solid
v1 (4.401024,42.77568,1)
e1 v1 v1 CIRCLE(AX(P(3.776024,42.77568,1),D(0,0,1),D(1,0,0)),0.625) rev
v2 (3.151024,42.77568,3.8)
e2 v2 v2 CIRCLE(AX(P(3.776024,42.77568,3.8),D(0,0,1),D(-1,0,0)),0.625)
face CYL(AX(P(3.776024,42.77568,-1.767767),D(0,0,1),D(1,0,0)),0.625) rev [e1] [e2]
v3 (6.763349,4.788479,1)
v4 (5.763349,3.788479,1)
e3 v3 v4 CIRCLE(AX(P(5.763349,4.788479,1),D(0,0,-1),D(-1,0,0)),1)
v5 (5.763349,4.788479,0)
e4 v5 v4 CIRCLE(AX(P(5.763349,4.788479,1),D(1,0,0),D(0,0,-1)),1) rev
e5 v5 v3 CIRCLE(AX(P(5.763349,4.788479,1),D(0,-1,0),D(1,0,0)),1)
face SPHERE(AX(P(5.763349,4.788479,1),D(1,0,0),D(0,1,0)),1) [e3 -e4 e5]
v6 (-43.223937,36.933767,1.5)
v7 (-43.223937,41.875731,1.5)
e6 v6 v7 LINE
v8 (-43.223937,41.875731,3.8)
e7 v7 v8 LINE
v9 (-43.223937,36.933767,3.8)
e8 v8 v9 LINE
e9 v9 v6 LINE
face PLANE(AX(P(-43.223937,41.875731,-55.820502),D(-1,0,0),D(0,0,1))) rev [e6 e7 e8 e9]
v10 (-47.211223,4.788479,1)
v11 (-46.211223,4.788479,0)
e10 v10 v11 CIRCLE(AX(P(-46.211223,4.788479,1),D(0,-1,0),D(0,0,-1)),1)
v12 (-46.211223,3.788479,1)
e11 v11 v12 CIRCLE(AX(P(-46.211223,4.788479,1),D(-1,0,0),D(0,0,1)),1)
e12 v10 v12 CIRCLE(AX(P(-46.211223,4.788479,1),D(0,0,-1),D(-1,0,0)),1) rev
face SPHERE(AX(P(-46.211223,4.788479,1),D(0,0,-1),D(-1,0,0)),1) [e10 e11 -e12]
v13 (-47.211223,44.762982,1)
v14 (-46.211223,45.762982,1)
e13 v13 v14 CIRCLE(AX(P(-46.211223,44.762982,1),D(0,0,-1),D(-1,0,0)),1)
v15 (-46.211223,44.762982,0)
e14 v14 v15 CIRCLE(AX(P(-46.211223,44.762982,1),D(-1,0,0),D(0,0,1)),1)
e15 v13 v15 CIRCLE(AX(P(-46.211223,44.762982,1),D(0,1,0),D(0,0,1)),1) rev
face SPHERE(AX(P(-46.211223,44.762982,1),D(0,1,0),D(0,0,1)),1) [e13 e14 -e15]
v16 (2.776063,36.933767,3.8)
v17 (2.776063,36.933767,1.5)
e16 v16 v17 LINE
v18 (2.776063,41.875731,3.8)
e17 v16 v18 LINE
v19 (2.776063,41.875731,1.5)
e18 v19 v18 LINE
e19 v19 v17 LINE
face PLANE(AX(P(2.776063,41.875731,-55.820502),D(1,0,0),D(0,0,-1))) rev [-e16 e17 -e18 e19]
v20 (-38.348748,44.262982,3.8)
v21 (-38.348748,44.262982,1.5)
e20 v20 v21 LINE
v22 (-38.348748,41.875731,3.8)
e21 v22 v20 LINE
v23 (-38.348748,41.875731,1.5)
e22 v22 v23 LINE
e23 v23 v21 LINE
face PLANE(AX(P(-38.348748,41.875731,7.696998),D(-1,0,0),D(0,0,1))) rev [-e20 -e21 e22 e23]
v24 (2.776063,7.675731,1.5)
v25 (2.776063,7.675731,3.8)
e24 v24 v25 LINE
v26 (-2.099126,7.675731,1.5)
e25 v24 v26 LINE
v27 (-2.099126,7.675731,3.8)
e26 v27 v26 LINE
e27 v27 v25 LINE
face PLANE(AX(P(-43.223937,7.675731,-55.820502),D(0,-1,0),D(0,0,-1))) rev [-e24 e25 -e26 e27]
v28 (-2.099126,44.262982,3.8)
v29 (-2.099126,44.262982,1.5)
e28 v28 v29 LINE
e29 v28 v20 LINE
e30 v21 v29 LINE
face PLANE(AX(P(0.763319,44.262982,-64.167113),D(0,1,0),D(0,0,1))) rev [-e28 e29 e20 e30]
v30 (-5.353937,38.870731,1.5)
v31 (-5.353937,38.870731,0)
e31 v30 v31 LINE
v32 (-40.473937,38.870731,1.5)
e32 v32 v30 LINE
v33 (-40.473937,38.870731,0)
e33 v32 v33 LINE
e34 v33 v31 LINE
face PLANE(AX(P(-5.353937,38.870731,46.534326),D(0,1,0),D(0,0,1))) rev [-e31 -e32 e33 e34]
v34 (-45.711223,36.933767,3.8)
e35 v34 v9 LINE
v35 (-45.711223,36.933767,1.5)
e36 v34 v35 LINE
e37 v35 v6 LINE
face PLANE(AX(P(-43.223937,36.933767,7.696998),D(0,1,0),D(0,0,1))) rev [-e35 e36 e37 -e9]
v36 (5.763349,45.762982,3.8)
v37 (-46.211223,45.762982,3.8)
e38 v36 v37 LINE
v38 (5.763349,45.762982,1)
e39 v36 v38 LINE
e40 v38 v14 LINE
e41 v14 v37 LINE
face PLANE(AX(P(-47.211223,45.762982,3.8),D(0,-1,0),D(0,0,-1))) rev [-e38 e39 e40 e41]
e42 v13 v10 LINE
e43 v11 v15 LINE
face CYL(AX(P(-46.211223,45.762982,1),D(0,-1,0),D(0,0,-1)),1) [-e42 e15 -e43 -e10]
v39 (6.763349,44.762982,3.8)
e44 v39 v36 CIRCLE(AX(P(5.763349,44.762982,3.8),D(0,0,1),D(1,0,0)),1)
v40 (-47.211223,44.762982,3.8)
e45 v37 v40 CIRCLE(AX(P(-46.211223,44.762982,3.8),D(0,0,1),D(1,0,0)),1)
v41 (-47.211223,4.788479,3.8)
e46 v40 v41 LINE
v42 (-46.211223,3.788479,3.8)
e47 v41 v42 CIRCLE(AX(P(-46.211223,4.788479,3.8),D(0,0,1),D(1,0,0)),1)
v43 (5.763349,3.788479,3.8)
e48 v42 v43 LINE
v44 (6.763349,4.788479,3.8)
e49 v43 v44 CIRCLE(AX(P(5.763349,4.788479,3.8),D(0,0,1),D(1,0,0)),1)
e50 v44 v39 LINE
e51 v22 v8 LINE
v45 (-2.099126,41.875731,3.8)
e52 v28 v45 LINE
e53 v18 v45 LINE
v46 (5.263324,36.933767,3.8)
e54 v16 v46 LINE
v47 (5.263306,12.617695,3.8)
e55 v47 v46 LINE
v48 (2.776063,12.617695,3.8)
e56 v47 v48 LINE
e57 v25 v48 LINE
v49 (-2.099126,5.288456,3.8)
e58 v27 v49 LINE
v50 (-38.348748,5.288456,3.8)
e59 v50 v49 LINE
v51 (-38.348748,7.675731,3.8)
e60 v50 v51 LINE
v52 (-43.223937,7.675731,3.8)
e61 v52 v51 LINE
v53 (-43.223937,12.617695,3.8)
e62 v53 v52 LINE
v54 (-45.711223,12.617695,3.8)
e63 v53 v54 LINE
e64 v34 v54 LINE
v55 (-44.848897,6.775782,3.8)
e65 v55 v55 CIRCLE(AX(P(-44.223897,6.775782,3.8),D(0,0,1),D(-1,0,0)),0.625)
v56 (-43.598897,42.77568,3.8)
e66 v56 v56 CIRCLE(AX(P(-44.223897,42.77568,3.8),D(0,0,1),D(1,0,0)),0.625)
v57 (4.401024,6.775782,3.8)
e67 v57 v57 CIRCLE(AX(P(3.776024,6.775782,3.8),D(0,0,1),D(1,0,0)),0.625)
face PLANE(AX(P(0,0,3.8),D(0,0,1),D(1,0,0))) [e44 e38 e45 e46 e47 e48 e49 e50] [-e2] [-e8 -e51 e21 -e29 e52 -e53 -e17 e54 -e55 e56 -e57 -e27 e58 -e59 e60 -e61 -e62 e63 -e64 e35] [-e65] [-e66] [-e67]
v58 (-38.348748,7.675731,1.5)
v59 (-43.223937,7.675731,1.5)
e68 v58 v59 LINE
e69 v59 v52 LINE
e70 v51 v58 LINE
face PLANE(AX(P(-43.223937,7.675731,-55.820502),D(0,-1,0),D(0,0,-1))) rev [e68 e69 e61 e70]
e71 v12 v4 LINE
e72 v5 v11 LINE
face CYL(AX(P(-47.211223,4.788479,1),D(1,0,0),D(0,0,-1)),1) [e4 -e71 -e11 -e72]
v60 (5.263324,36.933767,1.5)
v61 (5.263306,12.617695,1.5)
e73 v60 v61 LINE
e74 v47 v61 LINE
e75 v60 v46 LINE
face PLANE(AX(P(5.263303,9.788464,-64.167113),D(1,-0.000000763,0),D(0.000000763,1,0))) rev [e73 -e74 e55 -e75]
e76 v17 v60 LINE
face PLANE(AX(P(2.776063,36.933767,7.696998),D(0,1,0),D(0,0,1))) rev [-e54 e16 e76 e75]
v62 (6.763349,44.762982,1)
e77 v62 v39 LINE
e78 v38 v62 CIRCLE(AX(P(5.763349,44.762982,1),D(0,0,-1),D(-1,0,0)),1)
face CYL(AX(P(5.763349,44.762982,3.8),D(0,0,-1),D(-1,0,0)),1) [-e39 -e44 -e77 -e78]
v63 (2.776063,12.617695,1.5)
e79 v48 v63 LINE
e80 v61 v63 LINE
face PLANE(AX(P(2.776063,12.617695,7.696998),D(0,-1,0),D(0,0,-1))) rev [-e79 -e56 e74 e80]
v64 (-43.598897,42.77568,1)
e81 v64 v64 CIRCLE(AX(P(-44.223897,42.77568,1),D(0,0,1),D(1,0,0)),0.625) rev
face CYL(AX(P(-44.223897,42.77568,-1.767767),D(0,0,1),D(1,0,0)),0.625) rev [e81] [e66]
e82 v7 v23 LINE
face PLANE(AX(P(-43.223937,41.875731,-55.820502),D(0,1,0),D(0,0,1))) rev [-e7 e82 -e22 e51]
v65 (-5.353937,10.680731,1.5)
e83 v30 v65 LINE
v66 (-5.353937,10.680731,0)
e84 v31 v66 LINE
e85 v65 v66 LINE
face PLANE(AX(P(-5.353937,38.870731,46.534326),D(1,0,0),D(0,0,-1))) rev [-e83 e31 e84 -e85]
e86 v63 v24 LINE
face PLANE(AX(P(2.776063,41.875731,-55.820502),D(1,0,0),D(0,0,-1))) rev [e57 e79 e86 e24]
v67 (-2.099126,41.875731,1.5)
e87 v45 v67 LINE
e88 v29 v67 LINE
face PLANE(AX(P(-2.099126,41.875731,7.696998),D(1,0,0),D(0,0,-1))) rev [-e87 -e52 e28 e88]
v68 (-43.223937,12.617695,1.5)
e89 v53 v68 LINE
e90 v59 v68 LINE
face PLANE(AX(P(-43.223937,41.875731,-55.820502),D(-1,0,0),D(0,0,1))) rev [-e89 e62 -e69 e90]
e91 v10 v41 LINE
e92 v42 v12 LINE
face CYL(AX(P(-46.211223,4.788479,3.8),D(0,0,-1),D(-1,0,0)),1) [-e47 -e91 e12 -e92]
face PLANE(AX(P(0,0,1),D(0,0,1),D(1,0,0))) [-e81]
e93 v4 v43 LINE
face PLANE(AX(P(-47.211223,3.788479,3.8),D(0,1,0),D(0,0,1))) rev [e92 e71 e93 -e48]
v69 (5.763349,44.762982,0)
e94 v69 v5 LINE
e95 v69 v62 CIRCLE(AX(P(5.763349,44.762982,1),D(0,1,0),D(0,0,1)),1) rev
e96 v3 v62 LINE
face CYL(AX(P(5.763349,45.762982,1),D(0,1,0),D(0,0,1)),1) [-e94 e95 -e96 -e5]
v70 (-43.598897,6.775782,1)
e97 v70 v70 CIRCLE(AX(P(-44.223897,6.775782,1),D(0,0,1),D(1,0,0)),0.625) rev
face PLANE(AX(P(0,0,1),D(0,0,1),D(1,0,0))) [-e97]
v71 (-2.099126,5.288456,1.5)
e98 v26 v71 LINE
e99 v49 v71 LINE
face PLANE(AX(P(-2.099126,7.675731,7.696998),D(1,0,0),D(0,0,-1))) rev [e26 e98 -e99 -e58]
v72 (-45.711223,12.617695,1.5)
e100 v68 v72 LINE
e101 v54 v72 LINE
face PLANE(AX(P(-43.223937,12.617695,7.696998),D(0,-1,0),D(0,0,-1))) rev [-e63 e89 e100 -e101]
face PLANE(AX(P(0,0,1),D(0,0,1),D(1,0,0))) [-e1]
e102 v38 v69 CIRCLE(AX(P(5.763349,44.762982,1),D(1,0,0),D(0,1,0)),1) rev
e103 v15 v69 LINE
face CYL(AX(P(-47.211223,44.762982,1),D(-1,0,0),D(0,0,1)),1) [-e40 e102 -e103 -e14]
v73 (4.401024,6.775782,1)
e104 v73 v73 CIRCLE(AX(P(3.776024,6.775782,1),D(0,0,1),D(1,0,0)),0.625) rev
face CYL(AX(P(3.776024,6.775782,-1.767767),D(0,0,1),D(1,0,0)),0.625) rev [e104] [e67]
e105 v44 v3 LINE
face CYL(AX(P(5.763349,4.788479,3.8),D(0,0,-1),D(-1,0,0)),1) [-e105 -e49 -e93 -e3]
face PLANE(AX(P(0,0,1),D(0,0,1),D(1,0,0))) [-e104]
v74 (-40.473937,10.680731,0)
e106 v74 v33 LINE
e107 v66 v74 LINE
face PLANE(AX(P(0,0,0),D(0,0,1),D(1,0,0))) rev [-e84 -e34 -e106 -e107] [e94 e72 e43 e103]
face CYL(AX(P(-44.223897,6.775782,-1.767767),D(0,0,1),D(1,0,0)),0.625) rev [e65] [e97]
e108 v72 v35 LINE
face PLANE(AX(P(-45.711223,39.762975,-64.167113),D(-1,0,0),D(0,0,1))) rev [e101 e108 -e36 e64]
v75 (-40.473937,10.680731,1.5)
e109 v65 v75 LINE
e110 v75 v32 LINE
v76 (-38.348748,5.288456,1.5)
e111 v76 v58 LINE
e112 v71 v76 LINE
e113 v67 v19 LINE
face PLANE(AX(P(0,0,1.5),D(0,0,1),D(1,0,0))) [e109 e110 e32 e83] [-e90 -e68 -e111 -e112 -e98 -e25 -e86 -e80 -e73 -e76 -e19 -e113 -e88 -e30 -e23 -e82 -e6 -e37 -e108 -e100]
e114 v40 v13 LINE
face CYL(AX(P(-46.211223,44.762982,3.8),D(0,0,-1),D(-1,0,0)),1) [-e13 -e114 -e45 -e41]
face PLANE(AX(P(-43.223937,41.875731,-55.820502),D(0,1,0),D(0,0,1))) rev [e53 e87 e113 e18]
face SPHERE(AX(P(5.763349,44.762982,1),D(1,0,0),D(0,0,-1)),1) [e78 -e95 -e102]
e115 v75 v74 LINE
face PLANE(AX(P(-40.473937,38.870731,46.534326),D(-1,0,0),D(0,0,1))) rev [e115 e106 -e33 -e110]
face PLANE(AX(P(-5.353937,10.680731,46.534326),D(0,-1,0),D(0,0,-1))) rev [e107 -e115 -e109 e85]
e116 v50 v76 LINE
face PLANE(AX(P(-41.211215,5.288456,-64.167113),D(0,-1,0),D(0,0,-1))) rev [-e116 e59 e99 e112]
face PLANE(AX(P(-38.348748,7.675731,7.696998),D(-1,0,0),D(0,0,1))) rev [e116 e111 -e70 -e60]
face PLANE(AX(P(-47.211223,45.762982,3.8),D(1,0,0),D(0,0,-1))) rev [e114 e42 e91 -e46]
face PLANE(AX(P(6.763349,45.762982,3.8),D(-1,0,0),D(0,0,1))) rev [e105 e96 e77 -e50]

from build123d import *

# Parameters (mm, degrees)
SKETCH_2_W          = 53.974572009
SKETCH_2_H          = 41.974503429
EXTRUDE_1_DEPTH     = 3.8
CUT_EXTRUDE_1_DEPTH = 2.3
SKETCH_4_W          = 46
SKETCH_4_H          = 34.2
CUT_EXTRUDE_2_DEPTH = 2.3
SKETCH_5_R          = 0.625
CUT_EXTRUDE_3_DEPTH = 2.8
SKETCH_7_W          = 35.12
SKETCH_7_H          = 28.19
CUT_EXTRUDE_4_DEPTH = 1.5
SKETCH_8_W          = 3
SKETCH_8_H          = 2.387251715
SKETCH_8_W_2        = 2.487286004
SKETCH_8_H_2        = 3
SKETCH_8_W_3        = 2.487286005
SKETCH_8_W_4        = 3.00002286
SKETCH_8_H_3        = 2.387274574
SKETCH_8_W_5        = 2.999984296
EXTRUDE_2_DEPTH     = 2.3
FILLET_1_R          = 1


with BuildPart() as part:
    # 草图2 → 凸台-拉伸1 (new body)
    with BuildSketch(Plane.XY):
        with Locations((-20.223936838, 24.775730738)):
            Rectangle(SKETCH_2_W, SKETCH_2_H)
    extrude(amount=EXTRUDE_1_DEPTH)

    # 草图3 → 切除-拉伸1 (cut)
    with BuildSketch(Plane.XY.offset(3.8)):
        with BuildLine():
            Line((0.763318687, 42.775657077), (0.763318687, 44.262982452))
            Line((0.763318687, 44.262982452), (-41.211192362, 44.262982452))
            Line((-41.211192362, 44.262982452), (-41.211192362, 42.775679937))
            ThreePointArc((-41.211192362, 42.775679937), (-42.093593258, 40.645375728), (-44.223897468, 39.762974832))
            Line((-44.223897468, 39.762974832), (-45.711222842, 39.762974832))
            Line((-45.711222842, 39.762974832), (-45.711222842, 9.788486643))
            Line((-45.711222842, 9.788486643), (-44.223920328, 9.788486643))
            ThreePointArc((-44.223920328, 9.788486643), (-42.093616118, 8.906085747), (-41.211215222, 6.775781538))
            Line((-41.211215222, 6.775781538), (-41.211215222, 5.288456163))
            Line((-41.211215222, 5.288456163), (0.763295827, 5.288456163))
            Line((0.763295827, 5.288456163), (0.763295827, 6.775758677))
            ThreePointArc((0.763295827, 6.775758677), (1.645696722, 8.906062887), (3.776000932, 9.788463783))
            Line((3.776000932, 9.788463783), (5.263303447, 9.788463783))
            Line((5.263303447, 9.788463783), (5.263326307, 39.762951972))
            Line((5.263326307, 39.762951972), (3.776023792, 39.762951972))
            ThreePointArc((3.776023792, 39.762951972), (1.645719582, 40.645352868), (0.763318687, 42.775657077))
        make_face()
    extrude(amount=-CUT_EXTRUDE_1_DEPTH, mode=Mode.SUBTRACT)

    # 草图4 → 切除-拉伸2 (cut)
    with BuildSketch(Plane.XY.offset(3.8)):
        with Locations((-20.223936838, 24.775730737)):
            Rectangle(SKETCH_4_W, SKETCH_4_H)
    extrude(amount=-CUT_EXTRUDE_2_DEPTH, mode=Mode.SUBTRACT)

    # 草图5 → 切除-拉伸3 (cut)
    with BuildSketch(Plane.XY.offset(3.8)):
        with Locations((-44.223897468, 42.775679937)):
            Circle(SKETCH_5_R)
        with Locations((3.776023792, 42.775679937)):
            Circle(SKETCH_5_R)
        with Locations((3.776023792, 6.775781538)):
            Circle(SKETCH_5_R)
        with Locations((-44.223897468, 6.775781538)):
            Circle(SKETCH_5_R)
    extrude(amount=-CUT_EXTRUDE_3_DEPTH, mode=Mode.SUBTRACT)

    # 草图7 → 切除-拉伸4 (cut)
    with BuildSketch(Plane(origin=(0, 0, 0), x_dir=(-1, 0, 0), z_dir=(0, 0, -1))):
        with Locations((22.913936838, 24.775730737)):
            Rectangle(SKETCH_7_W, SKETCH_7_H)
    extrude(amount=-CUT_EXTRUDE_4_DEPTH, mode=Mode.SUBTRACT)


with BuildPart() as extrude_2_tool:
    # 草图8 → 凸台-拉伸2 (new body)
    with BuildSketch(Plane.XY.offset(1.5)):
        with Locations((-39.848748169, 43.069356595)):
            Rectangle(SKETCH_8_W, SKETCH_8_H)
        with Locations((-44.46757984, 38.43376671)):
            Rectangle(SKETCH_8_W_2, SKETCH_8_H_2)
        with Locations((4.019706165, 38.43376671)):
            Rectangle(SKETCH_8_W_3, SKETCH_8_H_2)
        with Locations((-0.599125507, 43.069356595)):
            Rectangle(SKETCH_8_W, SKETCH_8_H)
        with Locations((4.019706165, 11.117694765)):
            Rectangle(SKETCH_8_W_3, SKETCH_8_H_2)
        with Locations((-44.46757984, 11.117694765)):
            Rectangle(SKETCH_8_W_2, SKETCH_8_H_2)
        with Locations((-39.848759599, 6.48209345)):
            Rectangle(SKETCH_8_W_4, SKETCH_8_H_3)
        with Locations((-0.599133359, 6.48209345)):
            Rectangle(SKETCH_8_W_5, SKETCH_8_H_3)
    extrude(amount=EXTRUDE_2_DEPTH)


with BuildPart() as part_1:
    add(part.part)


with BuildPart() as part_2:
    # 凸台-拉伸2: joined with extrude_2_tool
    add(part_1.part.fuse(extrude_2_tool.part, tol=0.00001))

    # 圆角1
    fillet_1_edges = [part_2.edges().sort_by_distance(p)[0] for p in [
        (-20.223936838, 45.762982452, 0),
        (6.763349167, 24.775730737, 0),
        (-20.223936838, 3.788479023, 0),
        (-47.211222842, 24.775730737, 0),
        (-47.211222842, 45.762982452, 1.9),
        (6.763349167, 45.762982452, 1.9),
        (6.763349167, 3.788479023, 1.9),
        (-47.211222842, 3.788479023, 1.9),
    ]]
    fillet(fillet_1_edges, radius=FILLET_1_R)


solid = part_2.part
